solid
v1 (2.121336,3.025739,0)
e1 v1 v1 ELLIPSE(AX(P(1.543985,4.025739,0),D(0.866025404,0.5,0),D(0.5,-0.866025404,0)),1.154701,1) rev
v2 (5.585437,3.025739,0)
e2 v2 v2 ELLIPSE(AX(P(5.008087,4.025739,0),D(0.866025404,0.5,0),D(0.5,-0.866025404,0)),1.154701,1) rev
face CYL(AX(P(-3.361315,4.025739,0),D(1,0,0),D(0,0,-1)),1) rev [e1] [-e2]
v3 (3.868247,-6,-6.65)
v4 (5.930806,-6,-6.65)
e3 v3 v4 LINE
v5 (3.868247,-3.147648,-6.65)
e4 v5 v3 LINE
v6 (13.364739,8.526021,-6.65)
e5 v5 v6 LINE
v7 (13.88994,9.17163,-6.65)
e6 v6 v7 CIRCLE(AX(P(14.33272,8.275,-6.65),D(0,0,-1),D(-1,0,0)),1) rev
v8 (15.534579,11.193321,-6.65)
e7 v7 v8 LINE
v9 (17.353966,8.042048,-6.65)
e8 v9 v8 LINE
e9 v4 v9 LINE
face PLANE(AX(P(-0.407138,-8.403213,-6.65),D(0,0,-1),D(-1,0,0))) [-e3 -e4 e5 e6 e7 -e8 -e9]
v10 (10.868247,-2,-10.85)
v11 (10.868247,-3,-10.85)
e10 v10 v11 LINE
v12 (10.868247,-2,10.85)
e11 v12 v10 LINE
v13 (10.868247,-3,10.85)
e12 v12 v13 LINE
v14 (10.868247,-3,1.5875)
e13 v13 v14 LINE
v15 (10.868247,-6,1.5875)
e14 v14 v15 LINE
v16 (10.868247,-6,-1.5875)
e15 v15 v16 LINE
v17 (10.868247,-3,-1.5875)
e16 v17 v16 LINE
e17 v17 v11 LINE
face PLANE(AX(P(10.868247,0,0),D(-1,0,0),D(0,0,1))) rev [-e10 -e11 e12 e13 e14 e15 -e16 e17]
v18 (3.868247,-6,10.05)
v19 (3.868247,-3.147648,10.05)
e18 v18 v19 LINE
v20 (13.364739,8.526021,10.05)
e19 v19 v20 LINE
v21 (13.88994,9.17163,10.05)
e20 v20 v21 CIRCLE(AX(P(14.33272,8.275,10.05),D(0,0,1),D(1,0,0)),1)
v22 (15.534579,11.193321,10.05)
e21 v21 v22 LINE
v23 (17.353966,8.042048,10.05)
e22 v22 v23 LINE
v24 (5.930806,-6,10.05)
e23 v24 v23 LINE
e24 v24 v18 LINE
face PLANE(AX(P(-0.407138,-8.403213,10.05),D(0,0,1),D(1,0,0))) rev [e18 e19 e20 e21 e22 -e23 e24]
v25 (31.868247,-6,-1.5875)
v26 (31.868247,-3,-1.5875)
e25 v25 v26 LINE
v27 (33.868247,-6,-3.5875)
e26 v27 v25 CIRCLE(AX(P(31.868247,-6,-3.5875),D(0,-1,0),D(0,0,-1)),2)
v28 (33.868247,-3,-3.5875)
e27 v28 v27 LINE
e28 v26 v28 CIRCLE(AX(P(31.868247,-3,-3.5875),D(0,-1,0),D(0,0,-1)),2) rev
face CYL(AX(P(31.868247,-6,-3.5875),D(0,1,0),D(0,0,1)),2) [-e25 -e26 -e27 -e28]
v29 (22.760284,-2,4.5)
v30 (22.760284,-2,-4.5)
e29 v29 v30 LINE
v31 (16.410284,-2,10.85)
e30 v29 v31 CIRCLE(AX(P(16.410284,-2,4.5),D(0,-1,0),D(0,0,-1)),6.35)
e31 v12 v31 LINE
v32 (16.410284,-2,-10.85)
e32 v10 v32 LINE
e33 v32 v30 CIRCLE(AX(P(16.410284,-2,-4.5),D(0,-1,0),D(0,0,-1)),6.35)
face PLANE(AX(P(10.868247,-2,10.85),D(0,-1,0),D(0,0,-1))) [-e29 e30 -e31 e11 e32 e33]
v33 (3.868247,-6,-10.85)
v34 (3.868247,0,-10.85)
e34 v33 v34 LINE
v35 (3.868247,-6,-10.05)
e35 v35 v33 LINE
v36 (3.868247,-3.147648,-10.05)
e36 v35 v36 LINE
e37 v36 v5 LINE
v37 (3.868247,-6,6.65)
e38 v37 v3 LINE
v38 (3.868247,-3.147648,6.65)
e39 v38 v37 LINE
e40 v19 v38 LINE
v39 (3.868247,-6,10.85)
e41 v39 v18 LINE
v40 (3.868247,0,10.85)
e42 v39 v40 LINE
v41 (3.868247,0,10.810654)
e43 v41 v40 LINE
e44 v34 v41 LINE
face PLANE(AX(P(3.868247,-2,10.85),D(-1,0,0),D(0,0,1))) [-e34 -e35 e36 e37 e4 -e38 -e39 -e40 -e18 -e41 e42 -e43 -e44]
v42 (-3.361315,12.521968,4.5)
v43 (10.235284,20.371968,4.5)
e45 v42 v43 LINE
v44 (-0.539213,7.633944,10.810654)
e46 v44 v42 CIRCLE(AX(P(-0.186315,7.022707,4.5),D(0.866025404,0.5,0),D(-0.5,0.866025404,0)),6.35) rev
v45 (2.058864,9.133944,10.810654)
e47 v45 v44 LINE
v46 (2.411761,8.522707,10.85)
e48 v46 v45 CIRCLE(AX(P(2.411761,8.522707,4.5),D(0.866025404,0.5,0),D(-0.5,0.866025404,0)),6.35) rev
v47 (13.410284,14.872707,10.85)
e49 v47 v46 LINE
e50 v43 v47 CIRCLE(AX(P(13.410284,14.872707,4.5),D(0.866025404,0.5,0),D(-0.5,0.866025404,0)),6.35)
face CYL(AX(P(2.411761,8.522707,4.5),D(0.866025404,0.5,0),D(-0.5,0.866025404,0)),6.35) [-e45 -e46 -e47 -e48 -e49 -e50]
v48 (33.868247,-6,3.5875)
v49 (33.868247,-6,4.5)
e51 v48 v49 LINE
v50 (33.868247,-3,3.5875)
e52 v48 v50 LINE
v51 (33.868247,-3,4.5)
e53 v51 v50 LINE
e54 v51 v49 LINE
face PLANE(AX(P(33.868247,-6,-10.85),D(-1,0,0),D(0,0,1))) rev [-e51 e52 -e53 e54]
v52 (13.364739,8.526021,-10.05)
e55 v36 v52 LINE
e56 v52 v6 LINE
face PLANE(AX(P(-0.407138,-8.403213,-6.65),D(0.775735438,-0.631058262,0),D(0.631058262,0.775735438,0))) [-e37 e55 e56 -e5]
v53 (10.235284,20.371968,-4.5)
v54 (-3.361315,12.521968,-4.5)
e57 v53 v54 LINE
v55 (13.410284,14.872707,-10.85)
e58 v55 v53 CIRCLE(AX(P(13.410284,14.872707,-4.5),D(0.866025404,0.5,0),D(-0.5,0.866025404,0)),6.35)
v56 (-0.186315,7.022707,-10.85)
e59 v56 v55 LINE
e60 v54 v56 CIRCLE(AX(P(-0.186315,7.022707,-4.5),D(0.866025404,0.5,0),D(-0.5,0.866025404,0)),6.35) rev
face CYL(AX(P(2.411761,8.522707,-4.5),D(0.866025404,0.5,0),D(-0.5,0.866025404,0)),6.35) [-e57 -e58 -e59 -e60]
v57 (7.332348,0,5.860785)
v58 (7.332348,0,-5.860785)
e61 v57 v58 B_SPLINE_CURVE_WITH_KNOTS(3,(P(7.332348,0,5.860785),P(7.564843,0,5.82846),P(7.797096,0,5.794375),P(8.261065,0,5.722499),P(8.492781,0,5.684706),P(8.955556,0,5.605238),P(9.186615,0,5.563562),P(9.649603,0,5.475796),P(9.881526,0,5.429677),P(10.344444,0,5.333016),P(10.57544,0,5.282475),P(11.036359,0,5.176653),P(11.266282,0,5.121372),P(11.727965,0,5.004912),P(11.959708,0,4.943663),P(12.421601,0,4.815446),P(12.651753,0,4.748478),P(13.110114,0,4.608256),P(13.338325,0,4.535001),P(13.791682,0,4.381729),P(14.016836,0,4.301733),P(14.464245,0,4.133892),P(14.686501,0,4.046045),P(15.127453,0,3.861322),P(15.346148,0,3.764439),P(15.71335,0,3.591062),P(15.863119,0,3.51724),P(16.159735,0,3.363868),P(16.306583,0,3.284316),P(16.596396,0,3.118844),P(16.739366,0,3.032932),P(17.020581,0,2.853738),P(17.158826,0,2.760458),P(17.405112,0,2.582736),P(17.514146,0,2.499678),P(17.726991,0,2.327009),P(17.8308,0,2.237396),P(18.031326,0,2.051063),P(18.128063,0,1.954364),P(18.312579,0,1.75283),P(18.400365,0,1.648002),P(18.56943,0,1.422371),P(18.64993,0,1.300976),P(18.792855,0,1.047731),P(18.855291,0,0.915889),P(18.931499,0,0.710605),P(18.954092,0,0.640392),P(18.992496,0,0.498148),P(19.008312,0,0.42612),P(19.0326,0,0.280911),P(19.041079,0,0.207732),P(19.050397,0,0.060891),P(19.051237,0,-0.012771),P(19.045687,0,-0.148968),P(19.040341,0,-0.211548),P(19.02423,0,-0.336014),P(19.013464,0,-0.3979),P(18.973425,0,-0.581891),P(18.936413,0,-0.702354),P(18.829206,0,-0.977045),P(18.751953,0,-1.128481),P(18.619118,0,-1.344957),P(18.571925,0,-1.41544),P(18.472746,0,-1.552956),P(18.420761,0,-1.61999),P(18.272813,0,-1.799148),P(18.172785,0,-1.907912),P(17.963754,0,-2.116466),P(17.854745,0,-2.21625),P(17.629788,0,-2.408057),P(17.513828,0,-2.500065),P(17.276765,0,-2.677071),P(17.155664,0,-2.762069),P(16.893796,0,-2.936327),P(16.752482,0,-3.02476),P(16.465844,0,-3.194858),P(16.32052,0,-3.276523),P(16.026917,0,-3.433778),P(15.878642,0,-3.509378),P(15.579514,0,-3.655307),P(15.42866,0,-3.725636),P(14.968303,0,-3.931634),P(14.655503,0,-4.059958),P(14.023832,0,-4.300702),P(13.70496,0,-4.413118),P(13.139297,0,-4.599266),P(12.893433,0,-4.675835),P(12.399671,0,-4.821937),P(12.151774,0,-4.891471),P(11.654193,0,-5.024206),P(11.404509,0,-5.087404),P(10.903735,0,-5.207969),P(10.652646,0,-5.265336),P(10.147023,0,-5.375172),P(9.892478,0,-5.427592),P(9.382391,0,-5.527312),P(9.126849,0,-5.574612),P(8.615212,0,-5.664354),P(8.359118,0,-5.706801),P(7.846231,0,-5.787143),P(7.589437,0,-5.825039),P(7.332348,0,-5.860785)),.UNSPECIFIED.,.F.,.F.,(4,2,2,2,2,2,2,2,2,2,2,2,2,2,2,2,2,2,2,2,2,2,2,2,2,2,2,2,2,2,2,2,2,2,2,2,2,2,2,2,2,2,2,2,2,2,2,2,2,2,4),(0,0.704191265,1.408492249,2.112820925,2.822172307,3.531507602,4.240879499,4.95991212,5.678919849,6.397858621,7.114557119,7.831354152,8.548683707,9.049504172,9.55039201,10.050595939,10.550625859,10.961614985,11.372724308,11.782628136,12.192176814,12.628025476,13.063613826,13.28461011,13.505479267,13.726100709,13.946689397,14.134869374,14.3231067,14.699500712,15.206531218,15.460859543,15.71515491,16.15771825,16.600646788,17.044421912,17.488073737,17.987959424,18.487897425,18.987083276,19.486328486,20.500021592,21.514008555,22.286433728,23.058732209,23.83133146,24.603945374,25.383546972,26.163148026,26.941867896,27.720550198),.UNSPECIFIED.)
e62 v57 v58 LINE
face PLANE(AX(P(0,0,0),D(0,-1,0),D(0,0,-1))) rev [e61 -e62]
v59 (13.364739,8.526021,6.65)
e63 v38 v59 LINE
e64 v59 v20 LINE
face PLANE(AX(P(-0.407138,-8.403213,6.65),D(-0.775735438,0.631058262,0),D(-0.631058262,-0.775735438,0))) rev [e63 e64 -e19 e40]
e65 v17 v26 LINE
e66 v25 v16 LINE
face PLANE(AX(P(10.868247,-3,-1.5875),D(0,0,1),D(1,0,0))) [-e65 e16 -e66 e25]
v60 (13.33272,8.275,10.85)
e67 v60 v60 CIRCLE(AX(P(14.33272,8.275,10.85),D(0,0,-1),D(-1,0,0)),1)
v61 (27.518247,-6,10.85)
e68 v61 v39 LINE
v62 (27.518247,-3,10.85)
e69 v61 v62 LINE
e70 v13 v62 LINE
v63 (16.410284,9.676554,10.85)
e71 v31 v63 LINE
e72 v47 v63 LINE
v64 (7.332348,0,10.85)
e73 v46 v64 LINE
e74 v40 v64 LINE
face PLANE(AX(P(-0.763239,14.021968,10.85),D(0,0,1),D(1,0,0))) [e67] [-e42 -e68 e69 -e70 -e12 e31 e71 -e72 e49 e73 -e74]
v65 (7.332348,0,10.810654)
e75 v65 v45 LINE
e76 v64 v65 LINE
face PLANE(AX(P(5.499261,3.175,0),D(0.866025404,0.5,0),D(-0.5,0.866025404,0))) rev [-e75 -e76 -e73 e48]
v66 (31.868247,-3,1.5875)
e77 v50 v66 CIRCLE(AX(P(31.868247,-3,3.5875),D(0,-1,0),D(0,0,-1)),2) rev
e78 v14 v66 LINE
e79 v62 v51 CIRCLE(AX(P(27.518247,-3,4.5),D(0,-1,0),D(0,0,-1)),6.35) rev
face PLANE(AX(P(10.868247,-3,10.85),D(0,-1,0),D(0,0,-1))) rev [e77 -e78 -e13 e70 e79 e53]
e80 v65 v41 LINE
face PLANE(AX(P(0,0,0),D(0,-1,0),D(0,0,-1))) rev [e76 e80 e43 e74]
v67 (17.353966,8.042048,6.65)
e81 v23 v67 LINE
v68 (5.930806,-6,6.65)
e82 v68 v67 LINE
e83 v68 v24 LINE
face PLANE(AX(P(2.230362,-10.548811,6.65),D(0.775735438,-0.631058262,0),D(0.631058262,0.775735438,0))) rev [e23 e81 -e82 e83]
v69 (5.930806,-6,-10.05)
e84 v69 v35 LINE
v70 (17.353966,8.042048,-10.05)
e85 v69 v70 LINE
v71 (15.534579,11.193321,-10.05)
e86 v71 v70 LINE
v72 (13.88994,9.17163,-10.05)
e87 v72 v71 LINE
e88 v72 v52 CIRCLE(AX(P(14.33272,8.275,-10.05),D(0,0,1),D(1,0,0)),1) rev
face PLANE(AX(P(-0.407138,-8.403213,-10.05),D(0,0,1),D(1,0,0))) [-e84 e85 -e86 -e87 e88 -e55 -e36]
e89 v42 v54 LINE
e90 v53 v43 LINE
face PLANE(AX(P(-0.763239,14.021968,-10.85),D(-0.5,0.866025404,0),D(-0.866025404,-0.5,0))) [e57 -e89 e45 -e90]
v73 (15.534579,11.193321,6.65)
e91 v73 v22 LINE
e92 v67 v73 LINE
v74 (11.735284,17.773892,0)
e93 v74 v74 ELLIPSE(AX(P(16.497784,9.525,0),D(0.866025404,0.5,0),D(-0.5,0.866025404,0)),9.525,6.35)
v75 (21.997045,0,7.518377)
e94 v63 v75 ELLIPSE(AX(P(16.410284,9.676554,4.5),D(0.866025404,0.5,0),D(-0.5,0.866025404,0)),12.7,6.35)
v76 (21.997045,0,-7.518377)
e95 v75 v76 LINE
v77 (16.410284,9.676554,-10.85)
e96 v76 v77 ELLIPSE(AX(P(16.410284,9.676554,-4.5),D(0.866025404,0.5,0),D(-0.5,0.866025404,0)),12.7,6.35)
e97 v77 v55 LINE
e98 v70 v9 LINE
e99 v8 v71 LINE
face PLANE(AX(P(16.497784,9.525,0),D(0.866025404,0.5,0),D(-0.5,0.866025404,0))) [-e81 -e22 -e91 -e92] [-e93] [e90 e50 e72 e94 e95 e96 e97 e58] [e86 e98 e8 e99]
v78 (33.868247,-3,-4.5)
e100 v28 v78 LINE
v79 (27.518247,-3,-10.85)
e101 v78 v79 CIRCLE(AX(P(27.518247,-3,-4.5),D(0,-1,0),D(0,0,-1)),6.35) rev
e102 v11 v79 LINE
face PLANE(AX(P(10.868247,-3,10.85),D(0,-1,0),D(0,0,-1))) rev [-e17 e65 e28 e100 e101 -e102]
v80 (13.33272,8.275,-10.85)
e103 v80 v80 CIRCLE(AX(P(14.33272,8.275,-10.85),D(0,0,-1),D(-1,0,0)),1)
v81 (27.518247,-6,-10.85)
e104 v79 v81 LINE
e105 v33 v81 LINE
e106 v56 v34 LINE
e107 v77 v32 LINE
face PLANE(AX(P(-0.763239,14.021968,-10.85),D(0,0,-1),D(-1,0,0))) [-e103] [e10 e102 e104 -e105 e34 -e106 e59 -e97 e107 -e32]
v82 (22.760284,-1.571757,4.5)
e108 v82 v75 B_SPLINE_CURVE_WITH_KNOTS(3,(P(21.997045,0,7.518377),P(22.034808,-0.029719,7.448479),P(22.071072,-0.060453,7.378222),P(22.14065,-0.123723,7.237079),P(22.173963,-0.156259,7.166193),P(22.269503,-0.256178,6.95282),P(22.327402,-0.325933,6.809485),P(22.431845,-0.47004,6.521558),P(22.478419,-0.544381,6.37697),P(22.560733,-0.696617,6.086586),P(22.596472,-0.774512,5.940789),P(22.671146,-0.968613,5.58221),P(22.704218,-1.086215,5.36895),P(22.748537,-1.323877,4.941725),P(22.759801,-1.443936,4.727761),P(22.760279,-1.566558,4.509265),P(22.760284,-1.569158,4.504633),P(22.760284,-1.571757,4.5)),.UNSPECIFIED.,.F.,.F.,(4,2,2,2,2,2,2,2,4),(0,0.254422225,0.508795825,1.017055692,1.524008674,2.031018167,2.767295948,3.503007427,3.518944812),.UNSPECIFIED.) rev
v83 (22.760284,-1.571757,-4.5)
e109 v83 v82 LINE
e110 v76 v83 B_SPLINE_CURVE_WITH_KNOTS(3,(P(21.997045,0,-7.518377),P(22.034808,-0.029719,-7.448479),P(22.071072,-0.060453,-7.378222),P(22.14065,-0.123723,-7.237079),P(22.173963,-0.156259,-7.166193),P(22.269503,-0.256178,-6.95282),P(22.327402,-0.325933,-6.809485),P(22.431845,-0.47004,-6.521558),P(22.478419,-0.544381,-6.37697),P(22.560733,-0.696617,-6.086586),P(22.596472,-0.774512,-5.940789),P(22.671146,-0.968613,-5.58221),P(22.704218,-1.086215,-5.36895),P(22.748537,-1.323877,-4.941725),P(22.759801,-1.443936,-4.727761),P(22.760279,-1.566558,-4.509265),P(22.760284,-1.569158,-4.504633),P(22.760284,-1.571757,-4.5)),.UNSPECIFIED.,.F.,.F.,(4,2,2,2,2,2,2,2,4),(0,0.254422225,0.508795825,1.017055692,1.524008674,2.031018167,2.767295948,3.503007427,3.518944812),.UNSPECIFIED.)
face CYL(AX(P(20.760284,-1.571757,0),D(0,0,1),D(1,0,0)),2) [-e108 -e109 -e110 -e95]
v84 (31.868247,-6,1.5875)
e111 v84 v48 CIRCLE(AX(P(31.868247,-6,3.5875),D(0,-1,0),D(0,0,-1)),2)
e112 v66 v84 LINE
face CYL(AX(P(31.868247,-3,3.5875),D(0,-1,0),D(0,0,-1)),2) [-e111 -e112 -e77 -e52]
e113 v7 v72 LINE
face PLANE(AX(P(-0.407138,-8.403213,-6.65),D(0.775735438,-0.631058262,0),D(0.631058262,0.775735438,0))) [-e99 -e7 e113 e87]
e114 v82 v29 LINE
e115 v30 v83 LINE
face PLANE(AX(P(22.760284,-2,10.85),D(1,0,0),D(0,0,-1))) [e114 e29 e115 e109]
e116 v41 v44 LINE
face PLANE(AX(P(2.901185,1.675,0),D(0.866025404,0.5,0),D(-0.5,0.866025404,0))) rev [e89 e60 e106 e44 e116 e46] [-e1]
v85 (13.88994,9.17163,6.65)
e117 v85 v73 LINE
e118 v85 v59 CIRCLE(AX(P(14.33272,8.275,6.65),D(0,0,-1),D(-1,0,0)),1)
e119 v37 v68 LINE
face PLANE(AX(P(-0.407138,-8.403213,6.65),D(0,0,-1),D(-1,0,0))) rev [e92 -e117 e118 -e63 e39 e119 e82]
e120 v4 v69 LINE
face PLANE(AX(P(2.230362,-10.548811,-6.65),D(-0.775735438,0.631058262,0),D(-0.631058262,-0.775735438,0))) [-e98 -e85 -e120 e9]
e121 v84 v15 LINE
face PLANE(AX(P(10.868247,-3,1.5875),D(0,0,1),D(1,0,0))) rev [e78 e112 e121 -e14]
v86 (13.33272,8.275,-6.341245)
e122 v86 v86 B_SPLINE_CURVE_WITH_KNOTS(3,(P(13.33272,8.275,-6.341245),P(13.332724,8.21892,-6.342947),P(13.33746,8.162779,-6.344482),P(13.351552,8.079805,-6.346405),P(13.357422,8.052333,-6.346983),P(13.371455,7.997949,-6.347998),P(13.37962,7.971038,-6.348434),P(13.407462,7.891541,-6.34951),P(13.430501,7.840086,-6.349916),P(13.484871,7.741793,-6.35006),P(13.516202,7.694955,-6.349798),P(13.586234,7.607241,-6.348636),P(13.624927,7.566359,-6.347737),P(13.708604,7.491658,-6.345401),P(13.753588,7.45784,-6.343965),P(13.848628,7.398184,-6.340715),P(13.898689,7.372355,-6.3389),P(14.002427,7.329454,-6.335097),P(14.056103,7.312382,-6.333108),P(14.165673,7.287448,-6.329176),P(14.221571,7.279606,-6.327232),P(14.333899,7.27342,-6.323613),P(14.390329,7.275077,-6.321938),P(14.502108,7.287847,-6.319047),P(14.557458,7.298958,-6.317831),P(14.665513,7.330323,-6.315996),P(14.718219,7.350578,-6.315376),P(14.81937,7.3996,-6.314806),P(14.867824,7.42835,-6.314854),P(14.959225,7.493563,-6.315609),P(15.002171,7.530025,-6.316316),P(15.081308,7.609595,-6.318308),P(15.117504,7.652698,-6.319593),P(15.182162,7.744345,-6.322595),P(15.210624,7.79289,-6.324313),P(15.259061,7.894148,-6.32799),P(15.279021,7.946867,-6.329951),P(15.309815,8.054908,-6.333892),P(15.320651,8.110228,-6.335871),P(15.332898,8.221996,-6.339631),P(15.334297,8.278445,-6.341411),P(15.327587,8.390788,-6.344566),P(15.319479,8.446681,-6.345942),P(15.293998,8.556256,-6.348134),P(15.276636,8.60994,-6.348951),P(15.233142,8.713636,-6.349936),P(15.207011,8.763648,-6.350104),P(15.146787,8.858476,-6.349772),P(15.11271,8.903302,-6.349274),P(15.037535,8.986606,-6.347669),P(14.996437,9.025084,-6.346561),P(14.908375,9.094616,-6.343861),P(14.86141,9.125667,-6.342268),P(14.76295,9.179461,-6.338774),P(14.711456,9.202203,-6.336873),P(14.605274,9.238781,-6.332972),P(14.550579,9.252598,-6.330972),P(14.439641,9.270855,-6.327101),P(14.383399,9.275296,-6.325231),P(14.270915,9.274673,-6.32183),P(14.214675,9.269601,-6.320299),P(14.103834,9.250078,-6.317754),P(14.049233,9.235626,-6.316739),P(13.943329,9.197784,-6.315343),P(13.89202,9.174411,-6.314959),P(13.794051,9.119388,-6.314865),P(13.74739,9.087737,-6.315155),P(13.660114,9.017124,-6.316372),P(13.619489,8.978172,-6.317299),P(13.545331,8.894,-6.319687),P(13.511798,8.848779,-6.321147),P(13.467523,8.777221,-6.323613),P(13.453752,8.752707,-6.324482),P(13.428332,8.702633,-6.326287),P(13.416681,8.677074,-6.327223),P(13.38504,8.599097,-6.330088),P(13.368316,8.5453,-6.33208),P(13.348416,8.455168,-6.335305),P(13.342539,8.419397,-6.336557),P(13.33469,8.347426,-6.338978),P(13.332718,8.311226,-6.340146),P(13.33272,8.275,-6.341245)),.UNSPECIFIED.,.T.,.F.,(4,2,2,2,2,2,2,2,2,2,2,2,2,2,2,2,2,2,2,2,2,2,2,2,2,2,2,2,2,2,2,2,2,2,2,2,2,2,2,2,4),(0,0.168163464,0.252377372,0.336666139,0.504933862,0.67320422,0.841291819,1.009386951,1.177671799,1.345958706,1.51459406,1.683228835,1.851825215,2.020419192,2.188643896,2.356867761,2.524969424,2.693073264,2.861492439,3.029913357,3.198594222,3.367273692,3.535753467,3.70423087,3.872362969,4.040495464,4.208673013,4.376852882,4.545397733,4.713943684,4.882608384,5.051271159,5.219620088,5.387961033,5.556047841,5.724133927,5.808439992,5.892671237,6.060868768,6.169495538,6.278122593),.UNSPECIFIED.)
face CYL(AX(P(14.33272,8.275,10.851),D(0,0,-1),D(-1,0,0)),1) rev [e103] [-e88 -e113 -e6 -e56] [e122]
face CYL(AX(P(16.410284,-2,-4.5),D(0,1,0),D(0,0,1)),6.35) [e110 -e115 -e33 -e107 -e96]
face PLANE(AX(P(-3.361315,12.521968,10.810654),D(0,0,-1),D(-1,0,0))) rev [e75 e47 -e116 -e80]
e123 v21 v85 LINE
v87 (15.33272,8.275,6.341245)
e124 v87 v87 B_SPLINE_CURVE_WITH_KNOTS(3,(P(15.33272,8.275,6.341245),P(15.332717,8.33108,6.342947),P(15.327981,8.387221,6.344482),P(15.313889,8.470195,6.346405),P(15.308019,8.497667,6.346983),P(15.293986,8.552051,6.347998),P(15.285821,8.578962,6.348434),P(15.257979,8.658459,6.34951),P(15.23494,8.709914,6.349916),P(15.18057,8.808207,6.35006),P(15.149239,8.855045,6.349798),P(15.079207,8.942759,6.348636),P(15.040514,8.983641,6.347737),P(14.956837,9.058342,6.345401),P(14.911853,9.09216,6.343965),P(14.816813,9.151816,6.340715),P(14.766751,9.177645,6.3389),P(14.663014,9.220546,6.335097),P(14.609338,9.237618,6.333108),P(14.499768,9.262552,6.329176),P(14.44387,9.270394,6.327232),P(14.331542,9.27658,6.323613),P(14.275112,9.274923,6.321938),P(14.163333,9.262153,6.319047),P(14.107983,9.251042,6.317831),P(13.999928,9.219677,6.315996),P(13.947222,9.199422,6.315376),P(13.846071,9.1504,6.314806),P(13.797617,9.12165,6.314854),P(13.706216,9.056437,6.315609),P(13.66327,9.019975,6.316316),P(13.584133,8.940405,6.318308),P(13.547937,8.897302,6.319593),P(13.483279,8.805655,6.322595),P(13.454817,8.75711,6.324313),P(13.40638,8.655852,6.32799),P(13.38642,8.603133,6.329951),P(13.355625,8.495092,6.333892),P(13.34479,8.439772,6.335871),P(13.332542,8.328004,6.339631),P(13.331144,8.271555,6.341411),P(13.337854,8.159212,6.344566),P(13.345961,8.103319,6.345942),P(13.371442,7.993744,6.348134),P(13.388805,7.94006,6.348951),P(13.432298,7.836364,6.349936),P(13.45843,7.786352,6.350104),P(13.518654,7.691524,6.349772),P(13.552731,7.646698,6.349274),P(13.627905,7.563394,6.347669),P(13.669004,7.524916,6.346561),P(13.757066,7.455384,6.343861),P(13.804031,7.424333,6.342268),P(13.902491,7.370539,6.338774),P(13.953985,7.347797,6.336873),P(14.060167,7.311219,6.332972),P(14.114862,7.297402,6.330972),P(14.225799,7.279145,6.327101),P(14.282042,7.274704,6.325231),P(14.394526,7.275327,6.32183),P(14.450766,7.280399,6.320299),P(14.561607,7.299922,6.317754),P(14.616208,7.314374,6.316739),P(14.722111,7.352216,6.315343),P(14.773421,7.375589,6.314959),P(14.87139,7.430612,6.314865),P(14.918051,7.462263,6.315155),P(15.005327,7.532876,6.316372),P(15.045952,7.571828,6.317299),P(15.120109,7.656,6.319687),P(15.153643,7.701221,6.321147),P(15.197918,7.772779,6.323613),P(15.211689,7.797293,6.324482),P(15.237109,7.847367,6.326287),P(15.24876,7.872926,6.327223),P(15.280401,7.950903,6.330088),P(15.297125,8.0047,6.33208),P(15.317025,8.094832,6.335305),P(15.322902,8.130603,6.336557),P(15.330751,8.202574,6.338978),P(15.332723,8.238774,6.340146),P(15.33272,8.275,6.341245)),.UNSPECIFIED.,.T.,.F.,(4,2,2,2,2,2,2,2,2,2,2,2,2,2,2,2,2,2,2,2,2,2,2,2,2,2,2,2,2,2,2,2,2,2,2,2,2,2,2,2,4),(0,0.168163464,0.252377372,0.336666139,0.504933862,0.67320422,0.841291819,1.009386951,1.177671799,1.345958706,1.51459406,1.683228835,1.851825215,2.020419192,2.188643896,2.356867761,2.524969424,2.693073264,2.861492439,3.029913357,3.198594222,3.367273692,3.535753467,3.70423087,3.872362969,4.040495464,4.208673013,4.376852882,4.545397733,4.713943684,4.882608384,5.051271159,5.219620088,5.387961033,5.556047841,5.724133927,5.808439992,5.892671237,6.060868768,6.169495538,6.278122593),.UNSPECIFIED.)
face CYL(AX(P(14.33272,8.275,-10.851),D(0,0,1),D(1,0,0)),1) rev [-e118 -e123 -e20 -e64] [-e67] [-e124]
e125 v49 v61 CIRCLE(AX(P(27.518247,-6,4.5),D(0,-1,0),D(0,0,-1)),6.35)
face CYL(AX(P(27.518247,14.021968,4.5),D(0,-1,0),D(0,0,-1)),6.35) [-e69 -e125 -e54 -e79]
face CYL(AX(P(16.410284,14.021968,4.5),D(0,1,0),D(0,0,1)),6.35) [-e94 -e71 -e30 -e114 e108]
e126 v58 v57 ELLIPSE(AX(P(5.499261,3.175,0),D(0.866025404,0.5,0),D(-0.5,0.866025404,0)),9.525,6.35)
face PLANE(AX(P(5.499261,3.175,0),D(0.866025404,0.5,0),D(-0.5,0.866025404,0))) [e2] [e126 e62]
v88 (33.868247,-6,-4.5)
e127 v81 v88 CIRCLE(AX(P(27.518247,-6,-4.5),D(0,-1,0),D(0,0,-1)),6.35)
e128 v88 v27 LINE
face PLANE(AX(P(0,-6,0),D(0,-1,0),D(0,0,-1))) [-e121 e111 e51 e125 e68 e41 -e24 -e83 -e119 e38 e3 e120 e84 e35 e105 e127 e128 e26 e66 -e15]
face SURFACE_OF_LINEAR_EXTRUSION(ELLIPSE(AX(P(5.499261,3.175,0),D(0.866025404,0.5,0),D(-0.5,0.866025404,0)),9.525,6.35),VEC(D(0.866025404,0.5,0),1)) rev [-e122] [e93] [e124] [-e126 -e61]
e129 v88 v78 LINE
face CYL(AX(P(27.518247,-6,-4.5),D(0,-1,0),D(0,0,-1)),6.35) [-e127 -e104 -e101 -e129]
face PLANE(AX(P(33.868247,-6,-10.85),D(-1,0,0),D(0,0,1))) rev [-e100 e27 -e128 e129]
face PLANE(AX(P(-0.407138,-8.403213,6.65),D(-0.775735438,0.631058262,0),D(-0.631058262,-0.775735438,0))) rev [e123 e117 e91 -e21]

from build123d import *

# Parameters (mm, degrees)
SKETCH2_W           = 21.7
SKETCH2_H           = 25.05
SKETCH2_RX          = 9.525
SKETCH2_RY          = 6.35
BOSS_EXTRUDE1_DEPTH = 12.7
SKETCH3_W           = 21.660653916
SKETCH3_H           = 25.05
BOSS_EXTRUDE2_DEPTH = 3
SKETCH5_W           = 18.892037138
SKETCH5_H           = 21.7
BOSS_EXTRUDE3_DEPTH = 2
SKETCH6_W           = 30
SKETCH6_H           = 21.7
BOSS_EXTRUDE4_DEPTH = 4
SKETCH7_W           = 21.7
SKETCH7_H           = 1
SKETCH7_W_2         = 3.175
SKETCH7_H_2         = 3
CUT_EXTRUDE2_DEPTH  = 23
SKETCH7_3_W         = 21.7
SKETCH7_3_H         = 7.272473706
CUT_EXTRUDE3_DEPTH  = 44.803879418
SKETCH11_R          = 1
CUT_EXTRUDE8_DEPTH  = 33.487034031
CUT_EXTRUDE4_REACH  = 47.088
SKETCH9_R           = 1
SKETCH15_W          = 3.4
SKETCH15_H          = 3.4
CUT_EXTRUDE9_DEPTH  = 28.443249332
FILLET5_R           = 6.35
FILLET6_R           = 2
FILLET7_R           = 2


with BuildPart() as part:
    # Sketch2 → Boss-Extrude1 (new body)
    with BuildSketch(Plane(origin=(16.497783942, 9.525, 0), x_dir=(0, 0, -1), z_dir=(0.8660254037844379, 0.5000000000000013, 0))):
        Rectangle(SKETCH2_W, SKETCH2_H)
        with Locations(Location((0, 0), (0, 0, 90))):
            Ellipse(SKETCH2_RX, SKETCH2_RY, mode=Mode.SUBTRACT)
    extrude(amount=-BOSS_EXTRUDE1_DEPTH)

    # Sketch3 → Boss-Extrude2 (add)
    with BuildSketch(Plane(origin=(5.499261314, 3.175, 0), x_dir=(0, 0, 1), z_dir=(-0.8660254037844379, -0.5000000000000014, 0))):
        with Locations((-0.019673042, 0)):
            Rectangle(SKETCH3_W, SKETCH3_H)
    extrude(amount=BOSS_EXTRUDE2_DEPTH)

    # Sketch5 → Boss-Extrude3 (add)
    with BuildSketch(Plane(origin=(0, 0, 0), x_dir=(-1, 0, 0), z_dir=(0, 1, 0))):
        with Locations((-13.314265373, 0)):
            Rectangle(SKETCH5_W, SKETCH5_H)
    extrude(amount=-BOSS_EXTRUDE3_DEPTH)

    # Sketch6 → Boss-Extrude4 (add)
    with BuildSketch(Plane.XZ.offset(2)):
        with Locations((18.868246804, 0)):
            Rectangle(SKETCH6_W, SKETCH6_H)
    extrude(amount=BOSS_EXTRUDE4_DEPTH)

    # Sketch7 → Cut-Extrude2 (cut)
    with BuildSketch(Plane(origin=(33.868246804, 0, 0), x_dir=(0, 0, -1), z_dir=(1, 0, 0))):
        with Locations((0, -2.5)):
            Rectangle(SKETCH7_W, SKETCH7_H)
        with Locations((0, -4.5)):
            Rectangle(SKETCH7_W_2, SKETCH7_H_2)
    extrude(amount=-CUT_EXTRUDE2_DEPTH, mode=Mode.SUBTRACT)

    # Sketch7<3> → Cut-Extrude3 (cut, through all)
    with BuildSketch(Plane(origin=(33.868246804, 0, 0), x_dir=(0, 0, -1), z_dir=(1, 0, 0))):
        with Locations((0, -9.636236853)):
            Rectangle(SKETCH7_3_W, SKETCH7_3_H)
    extrude(amount=-CUT_EXTRUDE3_DEPTH, mode=Mode.SUBTRACT)

    # Sketch11 → Cut-Extrude8 (cut, through all)
    with BuildSketch(Plane(origin=(19.672783942, 0.194872981, 0), x_dir=(0, 0, -1), z_dir=(-1, 0, 0))):
        with Locations(Location((0, -3.830865705, 0), (0, 0, 90))):
            Circle(SKETCH11_R)
    extrude(amount=CUT_EXTRUDE8_DEPTH, mode=Mode.SUBTRACT)

    # Sketch9 → Cut-Extrude4 (cut, up to next)
    with BuildSketch(Plane(origin=(0, 0, -10.85), x_dir=(-1, 0, 0), z_dir=(0, 0, -1)), mode=Mode.PRIVATE) as cut_extrude4_sk1:
        with Locations((-14.332720433, 8.275)):
            Circle(SKETCH9_R)
    cut_extrude4_tool1 = extrude(cut_extrude4_sk1.sketch, amount=-CUT_EXTRUDE4_REACH, mode=Mode.PRIVATE) & part.part
    cut_extrude4 = cut_extrude4_tool1.solids().sort_by_distance((14.33272, 8.275, -10.85))[0]
    add(cut_extrude4, mode=Mode.SUBTRACT)

    # Sketch15 → Cut-Extrude9 (cut, symmetric)
    with BuildSketch(Plane(origin=(16.497783942, 9.525, 0), x_dir=(0.7757354378747654, -0.6310582623064579, 0), z_dir=(0.6310582623064579, 0.7757354378747654, 0))):
        with Locations((-0.1, -8.35)):
            Rectangle(SKETCH15_W, SKETCH15_H)
    cut_extrude9 = extrude(amount=CUT_EXTRUDE9_DEPTH, both=True, mode=Mode.SUBTRACT)

    # Mirror1: Cut-Extrude4, Cut-Extrude9 across plane
    add(cut_extrude4.mirror(Plane.XY), mode=Mode.SUBTRACT)
    add(cut_extrude9.mirror(Plane.XY), mode=Mode.SUBTRACT)

    # Fillet5
    fillet5_edges = [part.edges().sort_by_distance(p)[0] for p in [
        (33.868246804, -4.5, 10.85),
        (33.868246804, -4.5, -10.85),
        (22.760283942, -1, -10.85),
        (22.760283942, -1, 10.85),
        (4.736022628, 17.196968182, 10.85),
        (3.436984522, 16.446968182, -10.85),
    ]]
    fillet(fillet5_edges, radius=FILLET5_R)

    # Fillet6
    fillet6_edges = [part.edges().sort_by_distance(p)[0] for p in [
        (33.868246804, -4.5, 1.5875),
        (33.868246804, -4.5, -1.5875),
    ]]
    fillet(fillet6_edges, radius=FILLET6_R)

    # Fillet7
    # the kernel refuses this fillet: 2 mm, written as the material it takes off along each edge
    with BuildSketch(Plane(origin=(22.760283942, 0, 8.429393602), x_dir=(-1, 0, 0), z_dir=(0, 0, -1))) as fillet7_piece_1:
        with BuildLine():
            CenterArc((2, -1.571757441), FILLET7_R, 128.197977663, 51.802022337)
            Line((0, -1.571757441), (-0.04, -1.571757441))
            Line((-0.04, -1.571757441), (-0.04, 0))
            Line((-0.04, 0), (0, 0.04))
            ThreePointArc((0, 0.04), (0.381619343, 0.04), (0.73850346, 0.031435149))
            Line((0.73850346, 0.031435149), (0.763238686, 0))
        make_face()
    extrude(amount=16.858787203, mode=Mode.SUBTRACT)


solid = part.part
